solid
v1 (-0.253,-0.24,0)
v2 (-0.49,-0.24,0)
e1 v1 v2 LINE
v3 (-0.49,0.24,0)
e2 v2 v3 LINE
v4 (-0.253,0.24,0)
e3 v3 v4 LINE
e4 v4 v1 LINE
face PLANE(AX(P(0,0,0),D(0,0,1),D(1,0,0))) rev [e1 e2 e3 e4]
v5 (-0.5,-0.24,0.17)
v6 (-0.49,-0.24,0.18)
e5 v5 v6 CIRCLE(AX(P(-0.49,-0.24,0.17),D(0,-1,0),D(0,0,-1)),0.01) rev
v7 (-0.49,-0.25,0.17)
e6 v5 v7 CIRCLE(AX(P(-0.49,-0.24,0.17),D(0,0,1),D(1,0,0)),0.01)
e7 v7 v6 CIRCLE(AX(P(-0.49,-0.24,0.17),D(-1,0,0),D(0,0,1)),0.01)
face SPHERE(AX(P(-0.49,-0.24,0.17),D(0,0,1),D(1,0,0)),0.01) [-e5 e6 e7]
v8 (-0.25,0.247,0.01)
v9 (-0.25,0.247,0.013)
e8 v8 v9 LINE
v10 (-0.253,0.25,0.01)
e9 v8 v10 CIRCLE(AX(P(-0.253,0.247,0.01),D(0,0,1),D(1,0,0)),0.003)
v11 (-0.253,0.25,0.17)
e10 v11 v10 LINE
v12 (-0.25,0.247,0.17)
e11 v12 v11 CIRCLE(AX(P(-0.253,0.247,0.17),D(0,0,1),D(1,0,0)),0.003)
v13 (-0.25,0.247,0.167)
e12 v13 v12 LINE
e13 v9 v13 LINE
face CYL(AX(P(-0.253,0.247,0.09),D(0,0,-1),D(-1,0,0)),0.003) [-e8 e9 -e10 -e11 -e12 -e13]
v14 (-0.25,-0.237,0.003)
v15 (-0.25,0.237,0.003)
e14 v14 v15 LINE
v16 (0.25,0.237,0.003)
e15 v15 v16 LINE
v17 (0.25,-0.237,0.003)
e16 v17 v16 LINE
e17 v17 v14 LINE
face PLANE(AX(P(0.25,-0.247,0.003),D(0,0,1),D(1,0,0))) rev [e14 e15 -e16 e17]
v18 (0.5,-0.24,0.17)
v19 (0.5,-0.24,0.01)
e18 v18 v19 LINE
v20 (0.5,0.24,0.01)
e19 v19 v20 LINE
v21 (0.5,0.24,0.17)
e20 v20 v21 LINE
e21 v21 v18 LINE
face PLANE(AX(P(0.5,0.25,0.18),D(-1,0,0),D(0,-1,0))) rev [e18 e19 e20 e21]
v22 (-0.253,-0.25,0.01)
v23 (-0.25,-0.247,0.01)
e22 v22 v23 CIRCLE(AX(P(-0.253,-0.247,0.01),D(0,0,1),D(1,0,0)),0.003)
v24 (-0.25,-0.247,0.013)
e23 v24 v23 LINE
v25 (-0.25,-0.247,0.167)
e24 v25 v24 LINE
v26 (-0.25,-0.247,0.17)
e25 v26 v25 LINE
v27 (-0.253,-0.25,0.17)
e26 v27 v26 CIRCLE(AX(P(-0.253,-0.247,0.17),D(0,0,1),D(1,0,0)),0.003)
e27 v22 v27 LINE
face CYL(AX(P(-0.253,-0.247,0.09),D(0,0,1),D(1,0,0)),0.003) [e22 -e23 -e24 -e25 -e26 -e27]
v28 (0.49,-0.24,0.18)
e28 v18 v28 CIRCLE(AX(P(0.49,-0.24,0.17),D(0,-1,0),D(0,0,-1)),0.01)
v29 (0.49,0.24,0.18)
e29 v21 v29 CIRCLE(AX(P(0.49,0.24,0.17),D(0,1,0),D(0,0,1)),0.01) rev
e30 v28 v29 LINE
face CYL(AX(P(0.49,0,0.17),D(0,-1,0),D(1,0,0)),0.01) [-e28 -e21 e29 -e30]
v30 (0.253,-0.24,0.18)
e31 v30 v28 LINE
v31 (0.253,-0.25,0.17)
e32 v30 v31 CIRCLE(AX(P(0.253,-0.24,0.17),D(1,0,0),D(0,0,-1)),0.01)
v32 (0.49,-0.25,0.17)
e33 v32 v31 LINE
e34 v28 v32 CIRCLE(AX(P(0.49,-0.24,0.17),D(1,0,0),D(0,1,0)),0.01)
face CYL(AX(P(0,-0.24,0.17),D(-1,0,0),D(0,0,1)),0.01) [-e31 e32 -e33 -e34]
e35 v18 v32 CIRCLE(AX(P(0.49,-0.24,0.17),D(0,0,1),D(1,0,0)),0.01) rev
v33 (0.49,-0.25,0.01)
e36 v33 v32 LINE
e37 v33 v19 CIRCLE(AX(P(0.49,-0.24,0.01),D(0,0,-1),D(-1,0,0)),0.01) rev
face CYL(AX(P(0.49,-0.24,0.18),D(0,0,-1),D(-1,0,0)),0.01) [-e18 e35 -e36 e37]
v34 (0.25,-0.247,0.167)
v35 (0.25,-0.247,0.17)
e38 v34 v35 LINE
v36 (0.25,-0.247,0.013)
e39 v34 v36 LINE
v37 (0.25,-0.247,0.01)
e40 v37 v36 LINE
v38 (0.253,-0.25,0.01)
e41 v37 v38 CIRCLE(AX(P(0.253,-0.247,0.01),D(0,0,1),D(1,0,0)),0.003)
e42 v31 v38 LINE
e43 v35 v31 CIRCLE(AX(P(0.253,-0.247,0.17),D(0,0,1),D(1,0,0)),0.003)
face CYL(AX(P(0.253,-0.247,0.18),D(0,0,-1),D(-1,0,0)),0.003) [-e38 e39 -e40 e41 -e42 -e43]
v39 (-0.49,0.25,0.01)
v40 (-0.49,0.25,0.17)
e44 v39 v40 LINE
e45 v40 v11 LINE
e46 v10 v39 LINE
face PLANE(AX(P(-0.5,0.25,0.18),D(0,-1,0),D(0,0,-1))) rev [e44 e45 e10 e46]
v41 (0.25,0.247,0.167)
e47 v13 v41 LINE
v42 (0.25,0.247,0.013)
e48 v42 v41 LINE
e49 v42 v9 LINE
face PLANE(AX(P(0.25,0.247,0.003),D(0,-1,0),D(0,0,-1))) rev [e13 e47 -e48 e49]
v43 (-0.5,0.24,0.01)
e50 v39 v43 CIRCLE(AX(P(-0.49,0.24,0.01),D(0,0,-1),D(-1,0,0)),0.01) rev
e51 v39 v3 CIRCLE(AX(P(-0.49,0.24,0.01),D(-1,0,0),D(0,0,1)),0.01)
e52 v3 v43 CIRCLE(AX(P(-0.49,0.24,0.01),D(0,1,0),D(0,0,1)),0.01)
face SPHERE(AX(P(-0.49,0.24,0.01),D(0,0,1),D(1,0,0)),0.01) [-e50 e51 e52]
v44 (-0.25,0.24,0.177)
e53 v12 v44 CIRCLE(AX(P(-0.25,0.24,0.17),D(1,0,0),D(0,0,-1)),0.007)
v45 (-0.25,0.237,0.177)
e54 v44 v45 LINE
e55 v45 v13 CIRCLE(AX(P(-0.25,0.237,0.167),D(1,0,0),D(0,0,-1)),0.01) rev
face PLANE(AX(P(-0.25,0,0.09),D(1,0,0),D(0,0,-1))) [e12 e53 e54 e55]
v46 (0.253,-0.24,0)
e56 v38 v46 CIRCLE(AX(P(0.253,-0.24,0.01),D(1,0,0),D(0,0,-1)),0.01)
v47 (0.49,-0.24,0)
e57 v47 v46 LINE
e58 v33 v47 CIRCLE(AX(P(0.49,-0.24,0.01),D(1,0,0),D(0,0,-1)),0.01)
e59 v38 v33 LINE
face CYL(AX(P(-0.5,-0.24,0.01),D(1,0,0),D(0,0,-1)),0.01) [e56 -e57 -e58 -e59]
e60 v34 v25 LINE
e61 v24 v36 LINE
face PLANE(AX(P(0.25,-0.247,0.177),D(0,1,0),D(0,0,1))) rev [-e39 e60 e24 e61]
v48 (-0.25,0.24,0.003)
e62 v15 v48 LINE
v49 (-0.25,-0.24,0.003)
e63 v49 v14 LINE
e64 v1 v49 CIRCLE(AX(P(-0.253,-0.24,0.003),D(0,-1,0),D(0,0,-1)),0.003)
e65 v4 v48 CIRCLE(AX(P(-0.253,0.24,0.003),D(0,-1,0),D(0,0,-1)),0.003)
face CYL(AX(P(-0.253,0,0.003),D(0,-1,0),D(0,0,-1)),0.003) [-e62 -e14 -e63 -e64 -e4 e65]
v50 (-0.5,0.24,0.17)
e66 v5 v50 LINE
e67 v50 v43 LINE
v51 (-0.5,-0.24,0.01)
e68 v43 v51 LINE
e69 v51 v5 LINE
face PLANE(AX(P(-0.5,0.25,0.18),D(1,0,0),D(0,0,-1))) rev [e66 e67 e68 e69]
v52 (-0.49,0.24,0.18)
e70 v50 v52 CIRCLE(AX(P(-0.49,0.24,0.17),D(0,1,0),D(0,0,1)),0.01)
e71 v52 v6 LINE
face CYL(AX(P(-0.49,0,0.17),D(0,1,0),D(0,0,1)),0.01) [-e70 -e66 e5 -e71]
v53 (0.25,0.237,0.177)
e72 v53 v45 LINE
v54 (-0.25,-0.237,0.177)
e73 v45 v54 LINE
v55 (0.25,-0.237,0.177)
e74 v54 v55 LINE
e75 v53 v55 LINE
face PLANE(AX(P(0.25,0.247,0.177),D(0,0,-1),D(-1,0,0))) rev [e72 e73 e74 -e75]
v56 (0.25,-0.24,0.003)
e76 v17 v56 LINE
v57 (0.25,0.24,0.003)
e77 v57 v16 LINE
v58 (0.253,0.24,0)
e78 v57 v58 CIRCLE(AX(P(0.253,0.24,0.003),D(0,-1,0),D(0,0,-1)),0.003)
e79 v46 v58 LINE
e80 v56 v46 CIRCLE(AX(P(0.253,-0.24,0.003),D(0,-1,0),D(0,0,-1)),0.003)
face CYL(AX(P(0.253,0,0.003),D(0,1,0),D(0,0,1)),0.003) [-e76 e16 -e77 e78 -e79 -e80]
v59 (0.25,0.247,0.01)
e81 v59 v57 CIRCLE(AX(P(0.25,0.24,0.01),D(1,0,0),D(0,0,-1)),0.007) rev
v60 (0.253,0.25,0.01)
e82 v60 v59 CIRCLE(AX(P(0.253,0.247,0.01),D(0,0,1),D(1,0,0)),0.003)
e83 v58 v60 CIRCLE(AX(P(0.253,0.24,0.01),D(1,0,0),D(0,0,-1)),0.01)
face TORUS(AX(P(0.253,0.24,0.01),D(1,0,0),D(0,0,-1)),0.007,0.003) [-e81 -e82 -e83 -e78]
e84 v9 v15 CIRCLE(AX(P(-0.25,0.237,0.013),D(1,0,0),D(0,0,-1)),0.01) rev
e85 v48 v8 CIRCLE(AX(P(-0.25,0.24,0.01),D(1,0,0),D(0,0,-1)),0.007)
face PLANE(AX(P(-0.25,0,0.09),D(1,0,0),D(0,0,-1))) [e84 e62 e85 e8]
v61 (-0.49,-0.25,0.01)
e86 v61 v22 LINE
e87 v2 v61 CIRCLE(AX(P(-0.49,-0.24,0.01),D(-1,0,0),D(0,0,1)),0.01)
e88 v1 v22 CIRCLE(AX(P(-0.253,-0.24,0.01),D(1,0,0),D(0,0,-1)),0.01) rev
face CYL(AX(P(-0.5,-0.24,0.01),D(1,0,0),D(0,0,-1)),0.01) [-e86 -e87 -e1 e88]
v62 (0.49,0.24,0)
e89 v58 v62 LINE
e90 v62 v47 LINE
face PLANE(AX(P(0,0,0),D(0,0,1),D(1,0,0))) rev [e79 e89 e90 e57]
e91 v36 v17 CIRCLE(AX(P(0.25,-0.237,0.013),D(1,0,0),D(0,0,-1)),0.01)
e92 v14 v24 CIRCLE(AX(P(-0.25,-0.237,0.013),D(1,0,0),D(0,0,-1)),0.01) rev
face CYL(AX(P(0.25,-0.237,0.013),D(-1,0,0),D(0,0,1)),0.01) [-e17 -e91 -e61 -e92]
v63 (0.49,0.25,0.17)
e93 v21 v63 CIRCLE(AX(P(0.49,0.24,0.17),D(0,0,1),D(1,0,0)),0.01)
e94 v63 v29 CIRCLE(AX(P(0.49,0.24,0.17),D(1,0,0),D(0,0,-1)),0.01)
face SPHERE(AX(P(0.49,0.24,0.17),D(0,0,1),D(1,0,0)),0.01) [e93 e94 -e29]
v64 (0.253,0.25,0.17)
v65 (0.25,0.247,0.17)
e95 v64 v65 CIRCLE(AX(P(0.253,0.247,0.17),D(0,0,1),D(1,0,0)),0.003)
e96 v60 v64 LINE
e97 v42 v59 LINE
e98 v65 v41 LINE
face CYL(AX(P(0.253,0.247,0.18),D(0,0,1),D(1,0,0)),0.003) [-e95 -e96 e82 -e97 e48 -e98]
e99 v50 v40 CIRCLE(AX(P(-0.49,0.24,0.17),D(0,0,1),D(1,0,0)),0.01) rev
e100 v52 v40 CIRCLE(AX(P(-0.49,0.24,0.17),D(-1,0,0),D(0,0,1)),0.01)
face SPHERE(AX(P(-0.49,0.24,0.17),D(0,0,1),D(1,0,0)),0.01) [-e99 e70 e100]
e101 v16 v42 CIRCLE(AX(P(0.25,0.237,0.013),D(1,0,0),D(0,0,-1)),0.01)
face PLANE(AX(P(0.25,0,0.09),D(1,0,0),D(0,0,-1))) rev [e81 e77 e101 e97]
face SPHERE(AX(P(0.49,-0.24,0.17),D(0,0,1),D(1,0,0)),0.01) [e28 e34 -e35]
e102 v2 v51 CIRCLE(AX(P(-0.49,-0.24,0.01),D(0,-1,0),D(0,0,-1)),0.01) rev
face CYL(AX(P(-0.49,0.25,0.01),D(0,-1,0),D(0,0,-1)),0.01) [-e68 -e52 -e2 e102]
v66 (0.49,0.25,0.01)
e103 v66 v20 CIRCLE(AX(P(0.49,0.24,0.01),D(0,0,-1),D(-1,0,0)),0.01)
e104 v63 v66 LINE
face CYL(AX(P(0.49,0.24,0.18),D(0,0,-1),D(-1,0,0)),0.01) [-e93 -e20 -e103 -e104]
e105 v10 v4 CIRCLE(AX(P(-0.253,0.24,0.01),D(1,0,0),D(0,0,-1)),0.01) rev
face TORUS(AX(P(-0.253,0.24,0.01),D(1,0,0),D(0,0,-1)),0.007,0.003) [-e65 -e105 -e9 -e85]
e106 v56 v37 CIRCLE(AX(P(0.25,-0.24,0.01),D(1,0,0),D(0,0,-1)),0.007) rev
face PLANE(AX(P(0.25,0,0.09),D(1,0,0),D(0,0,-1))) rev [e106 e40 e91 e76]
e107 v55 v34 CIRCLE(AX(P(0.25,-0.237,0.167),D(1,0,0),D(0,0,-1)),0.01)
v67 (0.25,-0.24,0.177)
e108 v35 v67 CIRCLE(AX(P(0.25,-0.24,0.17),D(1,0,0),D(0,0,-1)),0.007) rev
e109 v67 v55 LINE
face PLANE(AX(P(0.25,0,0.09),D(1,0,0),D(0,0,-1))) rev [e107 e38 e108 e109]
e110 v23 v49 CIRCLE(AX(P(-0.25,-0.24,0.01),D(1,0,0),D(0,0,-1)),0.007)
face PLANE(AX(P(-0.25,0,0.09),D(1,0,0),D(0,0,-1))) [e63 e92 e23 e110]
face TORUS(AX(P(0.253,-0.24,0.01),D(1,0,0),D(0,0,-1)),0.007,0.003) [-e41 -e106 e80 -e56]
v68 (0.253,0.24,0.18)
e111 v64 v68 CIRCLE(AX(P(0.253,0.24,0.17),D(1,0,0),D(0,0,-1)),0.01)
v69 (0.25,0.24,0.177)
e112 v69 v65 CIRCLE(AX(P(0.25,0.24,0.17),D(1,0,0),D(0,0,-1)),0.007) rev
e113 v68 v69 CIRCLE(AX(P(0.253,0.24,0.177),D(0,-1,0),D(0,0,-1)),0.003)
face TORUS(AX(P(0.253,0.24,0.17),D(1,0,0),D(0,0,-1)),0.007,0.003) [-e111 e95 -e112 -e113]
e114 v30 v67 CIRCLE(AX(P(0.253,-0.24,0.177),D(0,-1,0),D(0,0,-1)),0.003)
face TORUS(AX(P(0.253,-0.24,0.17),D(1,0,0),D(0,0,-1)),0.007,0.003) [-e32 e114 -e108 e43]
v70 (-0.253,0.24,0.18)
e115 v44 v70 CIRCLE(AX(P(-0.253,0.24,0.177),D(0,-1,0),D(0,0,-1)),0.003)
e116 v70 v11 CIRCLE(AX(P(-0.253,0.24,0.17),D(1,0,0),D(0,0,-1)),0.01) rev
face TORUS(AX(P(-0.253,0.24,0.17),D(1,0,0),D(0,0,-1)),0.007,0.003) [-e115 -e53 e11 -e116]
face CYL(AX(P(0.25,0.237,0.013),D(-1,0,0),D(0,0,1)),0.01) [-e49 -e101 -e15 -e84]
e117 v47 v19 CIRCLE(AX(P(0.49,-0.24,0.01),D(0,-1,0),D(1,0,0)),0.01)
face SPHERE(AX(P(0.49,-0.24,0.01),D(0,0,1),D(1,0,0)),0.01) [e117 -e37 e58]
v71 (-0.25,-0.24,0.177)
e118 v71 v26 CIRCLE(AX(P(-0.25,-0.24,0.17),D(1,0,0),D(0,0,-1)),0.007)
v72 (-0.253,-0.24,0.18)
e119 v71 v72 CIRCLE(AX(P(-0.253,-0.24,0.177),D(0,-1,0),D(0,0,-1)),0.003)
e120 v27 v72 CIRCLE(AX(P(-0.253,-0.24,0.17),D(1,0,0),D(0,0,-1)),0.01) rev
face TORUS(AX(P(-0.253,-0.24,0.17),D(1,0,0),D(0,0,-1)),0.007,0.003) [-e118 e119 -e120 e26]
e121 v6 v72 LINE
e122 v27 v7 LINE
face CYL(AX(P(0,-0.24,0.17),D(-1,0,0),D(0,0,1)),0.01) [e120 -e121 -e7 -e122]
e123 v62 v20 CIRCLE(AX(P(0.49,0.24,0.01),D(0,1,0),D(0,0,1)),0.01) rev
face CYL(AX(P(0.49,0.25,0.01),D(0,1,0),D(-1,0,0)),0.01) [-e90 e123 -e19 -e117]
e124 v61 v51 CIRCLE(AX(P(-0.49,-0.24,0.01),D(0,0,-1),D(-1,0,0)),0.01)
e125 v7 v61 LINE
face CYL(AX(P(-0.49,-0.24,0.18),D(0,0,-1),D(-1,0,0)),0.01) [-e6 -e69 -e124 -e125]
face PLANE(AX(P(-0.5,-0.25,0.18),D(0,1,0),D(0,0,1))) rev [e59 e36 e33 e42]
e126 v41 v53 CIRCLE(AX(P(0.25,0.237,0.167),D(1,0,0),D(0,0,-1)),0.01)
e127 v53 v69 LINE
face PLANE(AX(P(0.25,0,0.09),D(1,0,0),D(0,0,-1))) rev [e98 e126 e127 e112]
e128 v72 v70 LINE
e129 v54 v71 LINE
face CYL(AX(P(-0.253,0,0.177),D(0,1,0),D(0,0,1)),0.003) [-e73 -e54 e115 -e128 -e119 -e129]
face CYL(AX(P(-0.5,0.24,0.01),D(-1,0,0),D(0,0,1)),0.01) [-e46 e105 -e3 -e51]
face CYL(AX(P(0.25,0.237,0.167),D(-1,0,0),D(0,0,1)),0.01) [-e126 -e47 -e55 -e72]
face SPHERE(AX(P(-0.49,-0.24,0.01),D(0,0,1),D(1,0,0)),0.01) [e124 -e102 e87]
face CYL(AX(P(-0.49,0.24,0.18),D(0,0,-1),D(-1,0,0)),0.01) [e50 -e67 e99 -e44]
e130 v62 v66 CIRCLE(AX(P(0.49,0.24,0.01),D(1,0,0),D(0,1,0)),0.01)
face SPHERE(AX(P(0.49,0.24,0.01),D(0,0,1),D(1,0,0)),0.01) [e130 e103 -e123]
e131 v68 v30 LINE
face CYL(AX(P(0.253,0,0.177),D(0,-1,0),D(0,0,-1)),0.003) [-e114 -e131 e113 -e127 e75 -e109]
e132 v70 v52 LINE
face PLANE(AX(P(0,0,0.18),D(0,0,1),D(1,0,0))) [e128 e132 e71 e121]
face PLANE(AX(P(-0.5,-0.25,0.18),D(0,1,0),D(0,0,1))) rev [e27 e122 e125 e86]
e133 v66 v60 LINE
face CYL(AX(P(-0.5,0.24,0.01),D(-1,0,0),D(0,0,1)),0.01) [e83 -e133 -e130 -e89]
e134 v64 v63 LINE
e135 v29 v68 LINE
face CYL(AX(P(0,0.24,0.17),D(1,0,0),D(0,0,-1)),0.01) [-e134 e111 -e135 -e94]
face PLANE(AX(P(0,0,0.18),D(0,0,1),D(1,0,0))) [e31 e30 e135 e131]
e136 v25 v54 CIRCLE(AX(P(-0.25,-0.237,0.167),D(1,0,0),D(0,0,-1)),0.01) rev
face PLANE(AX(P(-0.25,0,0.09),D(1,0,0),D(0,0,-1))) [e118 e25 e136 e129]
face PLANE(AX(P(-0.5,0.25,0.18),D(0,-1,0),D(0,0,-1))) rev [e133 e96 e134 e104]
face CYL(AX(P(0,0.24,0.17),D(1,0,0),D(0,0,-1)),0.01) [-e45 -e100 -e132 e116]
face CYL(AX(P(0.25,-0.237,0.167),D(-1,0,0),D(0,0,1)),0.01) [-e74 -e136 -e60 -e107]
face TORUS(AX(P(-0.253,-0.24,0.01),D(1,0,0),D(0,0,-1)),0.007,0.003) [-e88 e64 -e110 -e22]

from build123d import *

# Parameters (mm, degrees)
SKETCH1_W                           = 1
SKETCH1_H                           = 0.5
ALL_BODY_DEPTH                      = 0.18
CUT_OUT_THE_BODY_FOR_PIN_DEPTH      = 0.25
CUT_OUT_THE_BODY_FOR_PIN_DEPTH_BACK = 0.25
SKETCH2_OUTSIDE_W                   = 2.406
SKETCH2_OUTSIDE_H                   = 2.726
SKETCH2_OUTSIDE_W_2                 = 0.174
SKETCH2_OUTSIDE_H_2                 = 0.494
BODY_FILLET_R                       = 0.01
PIN_FILLET_A_R                      = 0.01
PIN_FILLET_B_R                      = 0.003


with BuildPart() as part:
    # Sketch1 → All body (new body)
    with BuildSketch(Plane.XY):
        Rectangle(SKETCH1_W, SKETCH1_H)
    extrude(amount=ALL_BODY_DEPTH)

    # Sketch2 outside → Cut out the body for pin (cut, two sides: drawn at the far end of the back side and taken through both)
    with BuildSketch(Plane(origin=(0, 0, 0), x_dir=(0, 0, -1), z_dir=(1, 0, 0)).offset(-CUT_OUT_THE_BODY_FOR_PIN_DEPTH_BACK)):
        with Locations((-0.09, 0)):
            Rectangle(SKETCH2_OUTSIDE_W, SKETCH2_OUTSIDE_H)
        with Locations((-0.09, 0)):
            Rectangle(SKETCH2_OUTSIDE_W_2, SKETCH2_OUTSIDE_H_2, mode=Mode.SUBTRACT)
    extrude(amount=CUT_OUT_THE_BODY_FOR_PIN_DEPTH + CUT_OUT_THE_BODY_FOR_PIN_DEPTH_BACK, mode=Mode.SUBTRACT)

    # Body fillet
    body_fillet_edges = [part.edges().sort_by_distance(p)[0] for p in [
        (0, 0.247, 0.003),
        (0, 0.247, 0.177),
        (0, -0.247, 0.177),
        (0, -0.247, 0.003),
    ]]
    fillet(body_fillet_edges, radius=BODY_FILLET_R)

    # Pin fillet a
    pin_fillet_a_edges = [part.edges().sort_by_distance(p)[0] for p in [
        (0.5, 0, 0.18),
        (-0.375, 0.25, 0),
        (0.375, -0.25, 0),
        (0.375, -0.25, 0.18),
        (-0.375, 0.25, 0.18),
        (0.375, 0.25, 0.18),
        (-0.5, 0, 0.18),
        (0.375, 0.25, 0),
        (0.5, 0, 0),
        (-0.375, -0.25, 0),
        (-0.5, 0, 0),
        (-0.5, 0.25, 0.09),
        (0.5, 0.25, 0.09),
        (0.5, -0.25, 0.09),
        (-0.5, -0.25, 0.09),
        (-0.375, -0.25, 0.18),
    ]]
    fillet(pin_fillet_a_edges, radius=PIN_FILLET_A_R)

    # Pin fillet b
    pin_fillet_b_edges = [part.edges().sort_by_distance(p)[0] for p in [
        (0.25, -0.25, 0.09),
        (0.25, 0, 0.18),
        (0.25, 0.25, 0.09),
        (0.25, 0, 0),
        (-0.25, 0.25, 0.09),
        (-0.25, 0, 0.18),
        (-0.25, -0.25, 0.09),
        (-0.25, 0, 0),
        (0.25, 0.247071068, 0.002928932),
        (0.25, -0.247071068, 0.002928932),
        (0.25, -0.247071068, 0.177071068),
        (0.25, 0.247071068, 0.177071068),
        (-0.25, -0.247071068, 0.177071068),
        (-0.25, 0.247071068, 0.177071068),
        (-0.25, -0.247071068, 0.002928932),
        (-0.25, 0.247071068, 0.002928932),
    ]]
    fillet(pin_fillet_b_edges, radius=PIN_FILLET_B_R - 0.0001)  # a hair under: the kernel refuses the full size


solid = part.part
